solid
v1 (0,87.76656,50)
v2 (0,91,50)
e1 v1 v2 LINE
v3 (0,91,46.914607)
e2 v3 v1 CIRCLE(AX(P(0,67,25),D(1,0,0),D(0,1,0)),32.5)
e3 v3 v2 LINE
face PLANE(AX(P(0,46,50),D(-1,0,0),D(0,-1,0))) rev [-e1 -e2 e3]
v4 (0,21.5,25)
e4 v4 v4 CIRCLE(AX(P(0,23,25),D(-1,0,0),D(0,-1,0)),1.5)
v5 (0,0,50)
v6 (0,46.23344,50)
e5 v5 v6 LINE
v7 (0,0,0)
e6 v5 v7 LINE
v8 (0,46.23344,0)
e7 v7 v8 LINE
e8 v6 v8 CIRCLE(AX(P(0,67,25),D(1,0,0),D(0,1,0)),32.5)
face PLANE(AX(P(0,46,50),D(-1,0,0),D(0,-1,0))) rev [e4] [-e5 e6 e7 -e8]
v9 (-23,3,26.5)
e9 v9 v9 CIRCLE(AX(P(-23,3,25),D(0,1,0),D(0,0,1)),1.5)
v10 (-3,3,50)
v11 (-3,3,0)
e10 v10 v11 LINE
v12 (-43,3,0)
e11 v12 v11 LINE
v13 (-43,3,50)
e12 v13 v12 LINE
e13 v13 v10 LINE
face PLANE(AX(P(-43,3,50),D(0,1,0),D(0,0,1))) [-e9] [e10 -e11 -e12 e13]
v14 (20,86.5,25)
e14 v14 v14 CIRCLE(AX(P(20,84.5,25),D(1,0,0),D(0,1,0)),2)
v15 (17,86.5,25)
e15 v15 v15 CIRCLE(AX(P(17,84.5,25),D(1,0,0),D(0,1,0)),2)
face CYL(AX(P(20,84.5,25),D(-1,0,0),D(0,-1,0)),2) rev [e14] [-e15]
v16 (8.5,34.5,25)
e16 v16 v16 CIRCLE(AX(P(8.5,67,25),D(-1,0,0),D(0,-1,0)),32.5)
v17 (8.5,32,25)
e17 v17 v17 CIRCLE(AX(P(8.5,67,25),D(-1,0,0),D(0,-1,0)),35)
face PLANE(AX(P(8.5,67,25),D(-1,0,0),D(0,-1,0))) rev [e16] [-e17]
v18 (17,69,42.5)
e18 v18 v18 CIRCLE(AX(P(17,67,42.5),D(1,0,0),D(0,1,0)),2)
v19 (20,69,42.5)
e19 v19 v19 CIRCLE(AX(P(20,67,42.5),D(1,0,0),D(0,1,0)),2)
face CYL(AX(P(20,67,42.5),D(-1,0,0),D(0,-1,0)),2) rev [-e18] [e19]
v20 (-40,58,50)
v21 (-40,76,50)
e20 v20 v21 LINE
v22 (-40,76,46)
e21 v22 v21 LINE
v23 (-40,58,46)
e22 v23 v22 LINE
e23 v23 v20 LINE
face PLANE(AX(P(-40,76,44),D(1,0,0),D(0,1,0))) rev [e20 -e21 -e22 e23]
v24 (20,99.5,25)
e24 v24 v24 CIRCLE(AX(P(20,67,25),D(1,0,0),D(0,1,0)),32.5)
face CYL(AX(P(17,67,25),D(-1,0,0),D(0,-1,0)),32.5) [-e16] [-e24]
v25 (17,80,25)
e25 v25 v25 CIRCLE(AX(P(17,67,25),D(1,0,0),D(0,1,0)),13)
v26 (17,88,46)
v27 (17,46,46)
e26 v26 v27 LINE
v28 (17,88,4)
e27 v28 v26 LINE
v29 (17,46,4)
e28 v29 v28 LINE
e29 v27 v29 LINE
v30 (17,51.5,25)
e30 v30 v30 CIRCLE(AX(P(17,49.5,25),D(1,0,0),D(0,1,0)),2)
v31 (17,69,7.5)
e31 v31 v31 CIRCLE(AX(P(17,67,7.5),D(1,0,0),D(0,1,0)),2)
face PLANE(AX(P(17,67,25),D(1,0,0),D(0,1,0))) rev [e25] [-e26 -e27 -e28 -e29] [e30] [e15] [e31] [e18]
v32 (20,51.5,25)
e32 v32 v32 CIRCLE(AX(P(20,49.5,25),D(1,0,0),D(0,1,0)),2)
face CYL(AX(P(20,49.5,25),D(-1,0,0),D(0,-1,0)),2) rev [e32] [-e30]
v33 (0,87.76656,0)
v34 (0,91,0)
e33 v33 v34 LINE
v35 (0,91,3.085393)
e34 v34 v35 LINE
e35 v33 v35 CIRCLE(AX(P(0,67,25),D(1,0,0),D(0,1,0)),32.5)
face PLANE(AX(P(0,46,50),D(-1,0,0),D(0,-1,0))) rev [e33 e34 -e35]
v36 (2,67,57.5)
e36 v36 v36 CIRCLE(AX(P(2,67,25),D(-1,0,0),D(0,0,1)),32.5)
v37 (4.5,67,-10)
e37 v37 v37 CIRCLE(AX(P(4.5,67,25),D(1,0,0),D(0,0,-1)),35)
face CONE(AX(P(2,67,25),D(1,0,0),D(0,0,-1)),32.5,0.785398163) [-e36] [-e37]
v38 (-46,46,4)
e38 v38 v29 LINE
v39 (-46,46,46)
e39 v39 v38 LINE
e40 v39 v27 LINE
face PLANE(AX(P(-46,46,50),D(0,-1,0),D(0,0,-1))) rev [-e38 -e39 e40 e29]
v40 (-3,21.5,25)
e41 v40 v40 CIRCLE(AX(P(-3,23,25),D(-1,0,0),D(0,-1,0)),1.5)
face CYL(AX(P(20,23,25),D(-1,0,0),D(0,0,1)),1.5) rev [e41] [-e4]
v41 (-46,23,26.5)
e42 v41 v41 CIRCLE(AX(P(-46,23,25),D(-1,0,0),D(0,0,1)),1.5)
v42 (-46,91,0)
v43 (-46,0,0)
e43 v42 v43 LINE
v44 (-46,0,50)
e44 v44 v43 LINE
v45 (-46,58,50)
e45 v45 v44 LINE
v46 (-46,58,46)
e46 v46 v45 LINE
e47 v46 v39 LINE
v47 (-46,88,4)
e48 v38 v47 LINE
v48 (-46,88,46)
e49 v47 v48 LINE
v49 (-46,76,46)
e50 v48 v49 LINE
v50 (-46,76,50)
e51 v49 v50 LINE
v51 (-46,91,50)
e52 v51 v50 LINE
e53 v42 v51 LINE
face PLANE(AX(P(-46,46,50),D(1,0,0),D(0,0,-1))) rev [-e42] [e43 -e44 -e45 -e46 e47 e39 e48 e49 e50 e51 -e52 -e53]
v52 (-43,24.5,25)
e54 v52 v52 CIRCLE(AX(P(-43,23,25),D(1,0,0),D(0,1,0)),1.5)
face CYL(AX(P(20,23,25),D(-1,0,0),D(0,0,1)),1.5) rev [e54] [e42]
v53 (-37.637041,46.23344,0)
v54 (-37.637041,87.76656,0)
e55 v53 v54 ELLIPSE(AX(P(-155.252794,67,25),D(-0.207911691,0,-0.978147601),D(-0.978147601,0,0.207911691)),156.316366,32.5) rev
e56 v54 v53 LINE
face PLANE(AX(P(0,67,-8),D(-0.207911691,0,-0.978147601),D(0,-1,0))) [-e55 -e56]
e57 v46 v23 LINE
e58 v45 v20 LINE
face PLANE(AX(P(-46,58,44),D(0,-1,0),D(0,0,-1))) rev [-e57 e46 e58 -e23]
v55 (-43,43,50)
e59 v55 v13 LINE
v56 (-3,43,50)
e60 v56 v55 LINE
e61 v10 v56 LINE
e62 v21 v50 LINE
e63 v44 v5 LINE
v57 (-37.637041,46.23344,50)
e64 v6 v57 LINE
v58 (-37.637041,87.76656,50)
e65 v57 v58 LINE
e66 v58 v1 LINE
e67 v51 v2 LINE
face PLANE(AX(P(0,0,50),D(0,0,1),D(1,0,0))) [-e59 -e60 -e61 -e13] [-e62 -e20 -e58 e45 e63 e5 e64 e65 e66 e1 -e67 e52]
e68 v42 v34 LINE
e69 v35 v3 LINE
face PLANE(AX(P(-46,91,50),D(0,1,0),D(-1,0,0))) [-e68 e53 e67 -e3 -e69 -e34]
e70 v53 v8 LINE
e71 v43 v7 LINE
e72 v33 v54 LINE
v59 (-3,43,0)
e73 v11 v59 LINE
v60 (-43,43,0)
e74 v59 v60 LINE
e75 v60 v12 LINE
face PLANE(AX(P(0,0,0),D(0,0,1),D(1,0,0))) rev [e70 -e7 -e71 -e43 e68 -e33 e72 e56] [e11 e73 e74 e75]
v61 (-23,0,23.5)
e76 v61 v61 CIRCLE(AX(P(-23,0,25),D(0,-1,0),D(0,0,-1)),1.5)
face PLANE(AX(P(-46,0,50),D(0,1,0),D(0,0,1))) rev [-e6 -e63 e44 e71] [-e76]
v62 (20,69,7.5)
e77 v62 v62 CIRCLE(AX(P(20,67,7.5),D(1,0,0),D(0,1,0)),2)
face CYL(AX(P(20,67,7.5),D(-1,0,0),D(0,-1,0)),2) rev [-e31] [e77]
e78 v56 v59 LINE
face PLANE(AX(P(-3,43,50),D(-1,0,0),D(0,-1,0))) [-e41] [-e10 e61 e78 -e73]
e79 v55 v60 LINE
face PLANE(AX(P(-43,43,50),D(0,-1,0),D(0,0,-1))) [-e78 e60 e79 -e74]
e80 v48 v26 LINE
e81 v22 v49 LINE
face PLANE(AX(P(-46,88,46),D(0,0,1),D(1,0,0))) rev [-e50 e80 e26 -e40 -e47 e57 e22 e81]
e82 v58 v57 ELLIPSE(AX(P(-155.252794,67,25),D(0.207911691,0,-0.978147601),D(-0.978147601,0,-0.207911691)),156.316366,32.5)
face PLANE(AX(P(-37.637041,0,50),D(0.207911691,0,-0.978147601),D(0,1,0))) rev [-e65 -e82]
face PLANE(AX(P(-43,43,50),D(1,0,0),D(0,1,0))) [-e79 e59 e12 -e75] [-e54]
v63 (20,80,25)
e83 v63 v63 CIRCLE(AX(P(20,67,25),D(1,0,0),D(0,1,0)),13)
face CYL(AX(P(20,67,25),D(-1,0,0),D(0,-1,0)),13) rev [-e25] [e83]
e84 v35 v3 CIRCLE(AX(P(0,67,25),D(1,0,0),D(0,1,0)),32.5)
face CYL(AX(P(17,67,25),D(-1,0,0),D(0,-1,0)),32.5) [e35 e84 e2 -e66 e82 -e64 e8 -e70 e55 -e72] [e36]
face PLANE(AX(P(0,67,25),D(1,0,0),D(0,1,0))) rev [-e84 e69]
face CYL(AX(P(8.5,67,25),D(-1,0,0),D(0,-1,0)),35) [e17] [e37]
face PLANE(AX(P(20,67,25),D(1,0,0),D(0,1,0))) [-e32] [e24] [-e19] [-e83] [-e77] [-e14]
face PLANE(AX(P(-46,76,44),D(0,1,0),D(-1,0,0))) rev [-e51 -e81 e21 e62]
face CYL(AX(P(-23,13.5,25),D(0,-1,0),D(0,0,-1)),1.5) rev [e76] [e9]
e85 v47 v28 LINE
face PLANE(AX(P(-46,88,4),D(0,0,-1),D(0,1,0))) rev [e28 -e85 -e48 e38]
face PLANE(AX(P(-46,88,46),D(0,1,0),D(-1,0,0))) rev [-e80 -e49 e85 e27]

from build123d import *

# Parameters (mm, degrees)
ESQUISSE1_W             = 46
ESQUISSE1_H             = 46
ESQUISSE1_W_2           = 40
ESQUISSE1_H_2           = 40
BOSS_EXTRU_1_DEPTH      = 50
ESQUISSE2_W             = 50
ESQUISSE2_H             = 48
ESQUISSE2_W_2           = 42
ESQUISSE2_H_2           = 42
BOSS_EXTRU_2_DEPTH      = 46
ESQUISSE4_W             = 6
ESQUISSE4_H             = 18
ENL_V_MAT_EXTRU_1_DEPTH = 6
ESQUISSE5_R             = 32.5
ESQUISSE5_W             = 42
ESQUISSE5_H             = 42
BOSS_EXTRU_3_DEPTH      = 17
ESQUISSE6_R             = 32.5
ESQUISSE6_R_2           = 2
ESQUISSE6_R_3           = 13
BOSS_EXTRU_4_DEPTH      = 3
CHANFREIN1_SIZE         = 37.637040876
CHANFREIN1_SIZE_2       = 8
BOSS_EXTRU_5_START      = -5
ESQUISSE7_R             = 35
ESQUISSE7_R_2           = 32.5
BOSS_EXTRU_5_DEPTH      = 3.5
CHANFREIN2_SIZE         = 3
ESQUISSE8_R             = 1.5
ENL_V_MAT_EXTRU_2_DEPTH = 136.499077488
ESQUISSE9_R             = 1.5
ENL_V_MAT_EXTRU_3_DEPTH = 13.5


with BuildPart() as part:
    # Esquisse1 → Boss.-Extru.1 (new body)
    with BuildSketch(Plane.XY):
        with Locations((-23, 23)):
            Rectangle(ESQUISSE1_W, ESQUISSE1_H)
        with Locations((-23, 23)):
            Rectangle(ESQUISSE1_W_2, ESQUISSE1_H_2, mode=Mode.SUBTRACT)
    extrude(amount=BOSS_EXTRU_1_DEPTH)

    # Esquisse2 → Boss.-Extru.2 (add)
    with BuildSketch(Plane(origin=(0, 0, 0), x_dir=(0, 0, -1), z_dir=(1, 0, 0))):
        with Locations((-25, 67)):
            Rectangle(ESQUISSE2_W, ESQUISSE2_H)
        with Locations((-25, 67)):
            Rectangle(ESQUISSE2_W_2, ESQUISSE2_H_2, mode=Mode.SUBTRACT)
    extrude(amount=-BOSS_EXTRU_2_DEPTH)

    # Esquisse4 → Enlèv. mat.-Extru.1 (cut)
    with BuildSketch(Plane.XY.offset(50)):
        with Locations((-43, 67)):
            Rectangle(ESQUISSE4_W, ESQUISSE4_H)
    extrude(amount=-ENL_V_MAT_EXTRU_1_DEPTH, mode=Mode.SUBTRACT)

    # Esquisse5 → Boss.-Extru.3 (add)
    with BuildSketch(Plane(origin=(0, 0, 0), x_dir=(0, 0, -1), z_dir=(1, 0, 0))):
        with Locations(Location((-25, 67, 0), (0, 0, 219.715137232))):
            Circle(ESQUISSE5_R)
        with Locations((-25, 67)):
            Rectangle(ESQUISSE5_W, ESQUISSE5_H, mode=Mode.SUBTRACT)
    extrude(amount=BOSS_EXTRU_3_DEPTH)

    # Esquisse6 → Boss.-Extru.4 (add)
    with BuildSketch(Plane(origin=(17, 0, 0), x_dir=(0, 0, -1), z_dir=(1, 0, 0))):
        with Locations(Location((-25, 67, 0), (0, 0, 219.715137232))):
            Circle(ESQUISSE6_R)
        with Locations(Location((-25, 84.5, 0), (0, 0, 90))):
            Circle(ESQUISSE6_R_2, mode=Mode.SUBTRACT)
        with Locations(Location((-7.5, 67, 0), (0, 0, 90))):
            Circle(ESQUISSE6_R_2, mode=Mode.SUBTRACT)
        with Locations(Location((-25, 49.5, 0), (0, 0, 90))):
            Circle(ESQUISSE6_R_2, mode=Mode.SUBTRACT)
        with Locations(Location((-42.5, 67, 0), (0, 0, 90))):
            Circle(ESQUISSE6_R_2, mode=Mode.SUBTRACT)
        with Locations(Location((-25, 67, 0), (0, 0, 90))):
            Circle(ESQUISSE6_R_3, mode=Mode.SUBTRACT)
    extrude(amount=BOSS_EXTRU_4_DEPTH)

    # Chanfrein1
    # the kernel refuses this chamfer: 37.637040876, 8 mm, written as the material it adds along each edge
    with BuildSketch(Plane(origin=(0, 185.543751295, 50), x_dir=(-0.999967974892076, 0, -0.008003073799517018), z_dir=(0, -1, 0))) as chanfrein1_piece_1_section:
        Polygon((CHANFREIN1_SIZE * 0.999967974888, -CHANFREIN1_SIZE * 0.00800307379948), (-CHANFREIN1_SIZE_2 * 0.00800307379952, -CHANFREIN1_SIZE_2 * 0.999967974892), (0, 0), align=None)
    chanfrein1_piece_1 = extrude(amount=237.08750259, mode=Mode.PRIVATE)
    chanfrein1_piece_1 = chanfrein1_piece_1 & Plane(origin=(-15.292244733, 67, 25), x_dir=(0, -0.6389710663806465, 0.7692307692288313), z_dir=(-1, 0, 0)) * Cylinder(32.5, 625, mode=Mode.PRIVATE)
    add(chanfrein1_piece_1)
    with BuildSketch(Plane(origin=(0, 185.543751295, 0), x_dir=(-0.999967974892076, 0, 0.008003073799517044), z_dir=(0, -1, 0))) as chanfrein1_piece_2_section:
        Polygon((CHANFREIN1_SIZE * 0.999967974888, CHANFREIN1_SIZE * 0.00800307379948), (-CHANFREIN1_SIZE_2 * 0.00800307379952, CHANFREIN1_SIZE_2 * 0.999967974892), (0, 0), align=None)
    chanfrein1_piece_2 = extrude(amount=237.08750259, mode=Mode.PRIVATE)
    chanfrein1_piece_2 = chanfrein1_piece_2 & Plane(origin=(-15.292244734, 67, 25), x_dir=(0, -0.6389710663806465, 0.7692307692288313), z_dir=(-1, 0, 0)) * Cylinder(32.5, 625, mode=Mode.PRIVATE)
    add(chanfrein1_piece_2)

    # Esquisse7 → Boss.-Extru.5 (add)
    with BuildSketch(Plane.ZY.offset(BOSS_EXTRU_5_START)):
        with Locations(Location((25, 67, 0), (0, 0, 270))):
            Circle(ESQUISSE7_R)
        with Locations(Location((25, 67, 0), (0, 0, 270))):
            Circle(ESQUISSE7_R_2, mode=Mode.SUBTRACT)
    extrude(amount=-BOSS_EXTRU_5_DEPTH)

    # Chanfrein2
    # the kernel refuses this chamfer: 3 mm, written as the material it adds along each edge
    with BuildSketch(Plane(origin=(5, 67, 25), x_dir=(0, -0.6389710663806288, 0.7692307692288458), z_dir=(0, -0.7692307692288458, -0.6389710663806288))) as chanfrein2_piece_1_section:
        Polygon((32.5 + CHANFREIN2_SIZE, 0), (32.5, CHANFREIN2_SIZE), (32.5, 0), align=None)
    chanfrein2_piece_1 = revolve(axis=Axis((5, 67, 25), (-1, 0, 0)), mode=Mode.PRIVATE)
    chanfrein2_piece_1 = chanfrein2_piece_1 & Plane(origin=(3.278266852, 67, 25), x_dir=(0, -1, 0), z_dir=(-1, 0, 0)) * Cylinder(35, 142, mode=Mode.PRIVATE)
    add(chanfrein2_piece_1)

    # Esquisse8 → Enlèv. mat.-Extru.2 (cut, through all)
    with BuildSketch(Plane.ZY.offset(46)):
        with Locations(Location((25, 23, 0), (0, 0, 270))):
            Circle(ESQUISSE8_R)
    extrude(amount=-ENL_V_MAT_EXTRU_2_DEPTH, mode=Mode.SUBTRACT)

    # Esquisse9 → Enlèv. mat.-Extru.3 (cut)
    with BuildSketch(Plane.XZ):
        with Locations(Location((-23, 25, 0), (0, 0, 270))):
            Circle(ESQUISSE9_R)
    extrude(amount=-ENL_V_MAT_EXTRU_3_DEPTH, mode=Mode.SUBTRACT)


solid = part.part
